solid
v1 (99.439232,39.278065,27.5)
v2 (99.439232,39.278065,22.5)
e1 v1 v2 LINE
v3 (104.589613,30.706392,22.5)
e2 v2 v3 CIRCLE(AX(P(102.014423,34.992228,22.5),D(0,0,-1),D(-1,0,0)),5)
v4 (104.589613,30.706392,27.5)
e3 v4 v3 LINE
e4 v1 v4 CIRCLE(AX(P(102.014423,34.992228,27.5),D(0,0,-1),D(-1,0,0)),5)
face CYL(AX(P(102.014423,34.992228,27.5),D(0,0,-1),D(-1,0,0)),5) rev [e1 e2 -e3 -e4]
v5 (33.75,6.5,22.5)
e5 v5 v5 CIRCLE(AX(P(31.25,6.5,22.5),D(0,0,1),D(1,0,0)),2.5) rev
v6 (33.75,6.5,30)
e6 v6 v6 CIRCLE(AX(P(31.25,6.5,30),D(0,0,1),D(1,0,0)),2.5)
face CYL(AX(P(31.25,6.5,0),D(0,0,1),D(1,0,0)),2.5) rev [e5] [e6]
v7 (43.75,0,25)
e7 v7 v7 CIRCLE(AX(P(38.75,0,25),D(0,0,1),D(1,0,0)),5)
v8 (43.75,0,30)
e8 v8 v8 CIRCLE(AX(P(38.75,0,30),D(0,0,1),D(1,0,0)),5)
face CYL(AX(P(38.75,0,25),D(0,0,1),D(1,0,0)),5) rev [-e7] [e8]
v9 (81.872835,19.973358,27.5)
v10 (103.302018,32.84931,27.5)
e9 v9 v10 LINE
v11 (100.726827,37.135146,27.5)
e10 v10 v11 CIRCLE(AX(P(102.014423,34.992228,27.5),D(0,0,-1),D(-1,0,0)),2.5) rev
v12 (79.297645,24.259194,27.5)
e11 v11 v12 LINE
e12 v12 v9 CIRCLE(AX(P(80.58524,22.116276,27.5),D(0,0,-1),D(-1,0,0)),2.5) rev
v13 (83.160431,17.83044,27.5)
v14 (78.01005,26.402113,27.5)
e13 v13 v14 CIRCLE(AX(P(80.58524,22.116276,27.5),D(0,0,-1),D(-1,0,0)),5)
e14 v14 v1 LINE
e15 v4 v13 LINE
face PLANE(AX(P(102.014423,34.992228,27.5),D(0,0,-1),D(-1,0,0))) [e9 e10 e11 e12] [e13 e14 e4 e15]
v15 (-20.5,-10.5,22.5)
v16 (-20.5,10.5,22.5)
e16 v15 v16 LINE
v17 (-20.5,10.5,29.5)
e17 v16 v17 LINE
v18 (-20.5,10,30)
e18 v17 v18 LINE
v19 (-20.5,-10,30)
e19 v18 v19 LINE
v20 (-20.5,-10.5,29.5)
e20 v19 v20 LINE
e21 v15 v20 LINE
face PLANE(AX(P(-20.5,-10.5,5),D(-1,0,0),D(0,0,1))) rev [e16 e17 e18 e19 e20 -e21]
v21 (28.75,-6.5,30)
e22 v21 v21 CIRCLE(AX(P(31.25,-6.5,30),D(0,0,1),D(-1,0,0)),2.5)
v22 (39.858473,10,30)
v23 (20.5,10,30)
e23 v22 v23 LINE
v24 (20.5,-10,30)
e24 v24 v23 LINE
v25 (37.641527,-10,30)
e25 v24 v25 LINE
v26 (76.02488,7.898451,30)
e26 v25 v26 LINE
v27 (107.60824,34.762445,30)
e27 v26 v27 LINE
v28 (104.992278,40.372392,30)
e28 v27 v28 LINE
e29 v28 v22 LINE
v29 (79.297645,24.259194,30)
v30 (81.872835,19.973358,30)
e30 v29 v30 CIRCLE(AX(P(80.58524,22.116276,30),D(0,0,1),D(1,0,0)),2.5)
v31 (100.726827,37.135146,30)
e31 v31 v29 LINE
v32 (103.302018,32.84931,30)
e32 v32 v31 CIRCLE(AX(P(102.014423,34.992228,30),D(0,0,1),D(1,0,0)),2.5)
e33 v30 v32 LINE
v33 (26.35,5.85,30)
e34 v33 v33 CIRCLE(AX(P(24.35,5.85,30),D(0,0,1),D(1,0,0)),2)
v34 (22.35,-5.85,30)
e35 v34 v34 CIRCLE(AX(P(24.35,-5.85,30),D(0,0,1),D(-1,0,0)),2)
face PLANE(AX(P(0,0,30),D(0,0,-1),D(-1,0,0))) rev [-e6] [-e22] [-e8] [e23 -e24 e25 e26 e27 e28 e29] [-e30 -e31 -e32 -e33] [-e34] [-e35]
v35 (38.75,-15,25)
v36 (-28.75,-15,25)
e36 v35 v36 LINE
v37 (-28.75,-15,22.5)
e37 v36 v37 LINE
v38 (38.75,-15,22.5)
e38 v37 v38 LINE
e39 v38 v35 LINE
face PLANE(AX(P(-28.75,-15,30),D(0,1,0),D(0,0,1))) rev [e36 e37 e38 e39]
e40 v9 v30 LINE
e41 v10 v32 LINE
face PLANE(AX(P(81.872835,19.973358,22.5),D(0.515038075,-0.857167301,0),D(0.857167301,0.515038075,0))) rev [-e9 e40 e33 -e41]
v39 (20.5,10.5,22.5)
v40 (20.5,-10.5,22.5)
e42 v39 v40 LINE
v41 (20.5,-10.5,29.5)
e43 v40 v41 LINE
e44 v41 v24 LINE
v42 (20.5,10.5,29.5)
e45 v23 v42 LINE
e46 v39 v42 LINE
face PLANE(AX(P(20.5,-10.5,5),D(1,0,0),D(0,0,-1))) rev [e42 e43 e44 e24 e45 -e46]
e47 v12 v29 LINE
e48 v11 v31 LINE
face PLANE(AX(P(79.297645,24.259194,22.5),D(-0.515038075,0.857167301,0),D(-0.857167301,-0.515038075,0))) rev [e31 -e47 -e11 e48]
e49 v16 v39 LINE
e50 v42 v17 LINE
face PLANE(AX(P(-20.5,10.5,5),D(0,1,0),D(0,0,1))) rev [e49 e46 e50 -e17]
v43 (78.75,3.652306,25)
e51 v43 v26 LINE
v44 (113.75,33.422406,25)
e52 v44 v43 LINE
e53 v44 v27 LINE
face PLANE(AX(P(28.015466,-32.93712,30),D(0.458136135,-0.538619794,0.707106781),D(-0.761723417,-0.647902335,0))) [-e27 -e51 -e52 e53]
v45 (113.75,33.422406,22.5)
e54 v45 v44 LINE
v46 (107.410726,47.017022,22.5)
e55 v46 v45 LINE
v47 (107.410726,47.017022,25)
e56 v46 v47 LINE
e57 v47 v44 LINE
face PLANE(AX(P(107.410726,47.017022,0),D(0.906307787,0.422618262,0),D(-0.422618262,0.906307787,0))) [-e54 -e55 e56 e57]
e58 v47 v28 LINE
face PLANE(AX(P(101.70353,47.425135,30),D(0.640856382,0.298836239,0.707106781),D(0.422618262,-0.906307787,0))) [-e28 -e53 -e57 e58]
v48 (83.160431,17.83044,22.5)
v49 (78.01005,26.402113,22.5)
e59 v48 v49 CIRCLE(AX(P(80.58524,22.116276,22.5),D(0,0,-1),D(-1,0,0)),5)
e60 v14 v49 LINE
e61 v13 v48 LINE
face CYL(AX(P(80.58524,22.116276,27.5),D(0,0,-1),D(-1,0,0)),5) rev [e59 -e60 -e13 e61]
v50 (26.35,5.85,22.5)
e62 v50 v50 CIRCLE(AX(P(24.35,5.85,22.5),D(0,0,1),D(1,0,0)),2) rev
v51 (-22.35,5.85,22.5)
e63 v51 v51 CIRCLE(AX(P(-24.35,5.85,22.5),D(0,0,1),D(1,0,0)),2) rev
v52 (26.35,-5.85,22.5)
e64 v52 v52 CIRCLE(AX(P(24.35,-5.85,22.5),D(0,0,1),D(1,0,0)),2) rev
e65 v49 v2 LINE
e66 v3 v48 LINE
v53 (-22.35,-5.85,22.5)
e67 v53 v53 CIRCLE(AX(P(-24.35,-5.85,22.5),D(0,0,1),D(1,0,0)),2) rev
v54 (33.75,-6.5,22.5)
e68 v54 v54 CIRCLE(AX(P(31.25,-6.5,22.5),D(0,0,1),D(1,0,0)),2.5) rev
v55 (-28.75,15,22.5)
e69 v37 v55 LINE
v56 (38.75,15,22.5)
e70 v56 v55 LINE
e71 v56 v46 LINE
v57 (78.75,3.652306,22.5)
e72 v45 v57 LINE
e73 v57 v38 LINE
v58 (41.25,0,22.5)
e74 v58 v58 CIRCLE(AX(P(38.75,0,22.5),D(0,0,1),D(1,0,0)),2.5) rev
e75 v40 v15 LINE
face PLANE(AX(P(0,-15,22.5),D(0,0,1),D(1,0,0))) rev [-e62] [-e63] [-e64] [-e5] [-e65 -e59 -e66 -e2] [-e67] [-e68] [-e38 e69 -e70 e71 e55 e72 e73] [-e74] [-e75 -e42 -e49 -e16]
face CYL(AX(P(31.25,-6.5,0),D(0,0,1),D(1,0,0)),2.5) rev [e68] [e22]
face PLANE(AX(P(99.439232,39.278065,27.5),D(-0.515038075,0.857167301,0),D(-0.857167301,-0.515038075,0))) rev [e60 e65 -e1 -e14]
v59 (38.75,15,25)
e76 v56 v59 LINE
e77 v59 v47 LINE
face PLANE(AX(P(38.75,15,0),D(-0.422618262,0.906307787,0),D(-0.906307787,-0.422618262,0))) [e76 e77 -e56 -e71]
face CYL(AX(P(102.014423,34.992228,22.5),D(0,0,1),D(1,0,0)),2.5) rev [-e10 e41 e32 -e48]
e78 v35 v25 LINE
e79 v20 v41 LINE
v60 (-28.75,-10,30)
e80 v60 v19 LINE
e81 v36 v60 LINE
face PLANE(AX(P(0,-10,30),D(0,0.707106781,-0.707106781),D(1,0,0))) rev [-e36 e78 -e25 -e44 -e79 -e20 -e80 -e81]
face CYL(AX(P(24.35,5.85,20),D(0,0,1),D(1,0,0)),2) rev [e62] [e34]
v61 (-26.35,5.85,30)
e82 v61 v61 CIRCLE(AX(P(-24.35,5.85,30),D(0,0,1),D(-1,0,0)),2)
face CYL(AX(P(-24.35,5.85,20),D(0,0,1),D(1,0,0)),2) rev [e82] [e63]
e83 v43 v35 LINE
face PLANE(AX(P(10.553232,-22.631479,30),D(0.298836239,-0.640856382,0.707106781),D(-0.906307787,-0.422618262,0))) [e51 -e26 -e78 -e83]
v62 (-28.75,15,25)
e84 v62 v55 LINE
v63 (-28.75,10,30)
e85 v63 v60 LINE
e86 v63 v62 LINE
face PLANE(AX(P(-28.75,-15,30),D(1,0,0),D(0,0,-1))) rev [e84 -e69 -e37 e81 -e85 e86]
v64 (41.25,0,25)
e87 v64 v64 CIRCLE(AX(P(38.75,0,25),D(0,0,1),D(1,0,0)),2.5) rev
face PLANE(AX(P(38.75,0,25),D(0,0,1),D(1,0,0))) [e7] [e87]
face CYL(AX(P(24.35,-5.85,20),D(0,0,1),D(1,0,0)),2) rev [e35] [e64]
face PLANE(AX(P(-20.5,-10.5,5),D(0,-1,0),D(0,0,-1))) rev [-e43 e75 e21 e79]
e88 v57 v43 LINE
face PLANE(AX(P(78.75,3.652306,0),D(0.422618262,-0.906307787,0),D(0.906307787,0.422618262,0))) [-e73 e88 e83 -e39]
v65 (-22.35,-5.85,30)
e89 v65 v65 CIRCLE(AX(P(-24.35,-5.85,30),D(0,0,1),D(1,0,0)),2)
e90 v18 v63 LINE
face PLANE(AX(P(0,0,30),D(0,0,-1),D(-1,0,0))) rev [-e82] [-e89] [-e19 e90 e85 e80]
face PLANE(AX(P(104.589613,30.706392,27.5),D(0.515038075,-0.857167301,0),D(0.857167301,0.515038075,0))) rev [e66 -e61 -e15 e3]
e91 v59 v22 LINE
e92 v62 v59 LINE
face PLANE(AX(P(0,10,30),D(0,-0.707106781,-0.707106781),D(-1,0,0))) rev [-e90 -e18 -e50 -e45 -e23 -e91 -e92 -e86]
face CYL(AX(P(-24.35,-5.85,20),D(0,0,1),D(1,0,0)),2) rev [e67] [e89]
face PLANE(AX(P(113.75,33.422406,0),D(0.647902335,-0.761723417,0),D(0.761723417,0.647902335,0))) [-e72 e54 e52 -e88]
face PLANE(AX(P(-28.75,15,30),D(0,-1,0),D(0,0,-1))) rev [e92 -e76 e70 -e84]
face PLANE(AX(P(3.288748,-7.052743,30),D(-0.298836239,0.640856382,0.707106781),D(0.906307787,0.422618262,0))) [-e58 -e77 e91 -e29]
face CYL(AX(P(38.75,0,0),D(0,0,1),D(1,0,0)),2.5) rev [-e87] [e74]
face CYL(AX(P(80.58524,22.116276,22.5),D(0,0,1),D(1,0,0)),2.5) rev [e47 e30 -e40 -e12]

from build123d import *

# Parameters (mm, degrees)
SKETCH1_W                = 57.5
SKETCH1_H                = 30
BOSS_EXTRUDE1_DEPTH      = 30
SKETCH2_W                = 41
SKETCH2_H                = 21
CUT_EXTRUDE1_DEPTH       = 25
SKETCH8_R                = 2
CUT_EXTRUDE6_DEPTH       = 10
SKETCH10_R               = 5
CUT_EXTRUDE8_DEPTH       = 10
BOSS_EXTRUDE4_DEPTH      = 30
SKETCH16_R               = 5
CUT_EXTRUDE10_DEPTH      = 30
CHAMFER5_SIZE            = 5
SKETCH19_R               = 2.5
CUT_EXTRUDE12_DEPTH      = 30
SKETCH20_R               = 7.5
CUT_EXTRUDE13_DEPTH      = 2.5
CUT_EXTRUDE15_DEPTH      = 122.918629513
CUT_EXTRUDE15_DEPTH_BACK = 122.918629513
SKETCH29_W               = 67.5
SKETCH29_H               = 17.5
CUT_EXTRUDE16_DEPTH      = 124.312257678
SKETCH32_R               = 5
CUT_EXTRUDE18_DEPTH      = 5
CUT_EXTRUDE19_DEPTH      = 5


with BuildPart() as part:
    # Sketch1 → Boss-Extrude1 (new body)
    with BuildSketch(Plane.XY):
        Rectangle(SKETCH1_W, SKETCH1_H)
    extrude(amount=BOSS_EXTRUDE1_DEPTH)

    # Sketch2 → Cut-Extrude1 (cut)
    with BuildSketch(Plane.XY.offset(30)):
        Rectangle(SKETCH2_W, SKETCH2_H)
    extrude(amount=-CUT_EXTRUDE1_DEPTH, mode=Mode.SUBTRACT)

    # Sketch8 → Cut-Extrude6 (cut)
    with BuildSketch(Plane.XY.offset(30)):
        with Locations((24.35, 5.85)):
            Circle(SKETCH8_R)
        with Locations(Location((24.35, -5.85, 0), (0, 0, 180))):
            Circle(SKETCH8_R)
        with Locations((-24.35, -5.85)):
            Circle(SKETCH8_R)
        with Locations(Location((-24.35, 5.85, 0), (0, 0, 180))):
            Circle(SKETCH8_R)
    extrude(amount=-CUT_EXTRUDE6_DEPTH, mode=Mode.SUBTRACT)

    # Sketch10 → Cut-Extrude8 (cut)
    with BuildSketch(Plane.XY.offset(5)):
        with Locations((-10, 0)):
            Circle(SKETCH10_R)
    extrude(amount=-CUT_EXTRUDE8_DEPTH, mode=Mode.SUBTRACT)

    # Sketch13 → Boss-Extrude4 (add)
    with BuildSketch(Plane.XY.offset(30)):
        Polygon((28.75, 15), (38.75, 15), (107.410726074, 47.017022383), (113.75, 33.422405577), (78.75, 3.652306326), (38.75, -15), (28.75, -15), align=None)
    extrude(amount=-BOSS_EXTRUDE4_DEPTH)

    # Sketch16 → Cut-Extrude10 (cut)
    with BuildSketch(Plane(origin=(1.175656739, -2.521204013, 0), x_dir=(0.9063077870366488, 0.42261826174070183, 0), z_dir=(-0.42261826174070183, 0.9063077870366488, 0))):
        with Locations(Location((97.217429724, -15, 0), (0, 0, 180))):
            Circle(SKETCH16_R)
        with BuildLine():
            Line((67.217429724, -12.5), (82.217429724, -12.5))
            ThreePointArc((82.217429724, -12.5), (84.717429724, -15), (82.217429724, -17.5))
            Line((82.217429724, -17.5), (67.217429724, -17.5))
            ThreePointArc((67.217429724, -17.5), (64.717429724, -15), (67.217429724, -12.5))
        make_face()
    extrude(amount=-CUT_EXTRUDE10_DEPTH, mode=Mode.SUBTRACT)

    # Chamfer5
    # the kernel refuses this chamfer: 5 mm, written as the material it takes off along each edge
    with BuildSketch(Plane(origin=(-28.75, 27.85841494, 0), x_dir=(-0.027495876610586317, 0, 0.9996219169112968), z_dir=(0, -1, 0))) as chamfer5_piece_1:
        Polygon((CHAMFER5_SIZE * 0.999621916911, -CHAMFER5_SIZE * 0.0274958766106), (-CHAMFER5_SIZE * 0.0274958766106, -CHAMFER5_SIZE * 0.999621916911), (0, 0), align=None)
    extrude(amount=55.71682988, mode=Mode.SUBTRACT)
    with BuildSketch(Plane(origin=(-41.60841494, -15, 0), x_dir=(0, -0.027495876610586317, 0.9996219169112968), z_dir=(1, 0, 0)), Plane(origin=(51.60841494, -15, 30), x_dir=(0, -0.027495876610586317, -0.9996219169112968), z_dir=(-1, 0, 0))) as chamfer5_piece_2:
        Polygon((CHAMFER5_SIZE * 0.999621916911, -CHAMFER5_SIZE * 0.0274958766106), (-CHAMFER5_SIZE * 0.0274958766106, -CHAMFER5_SIZE * 0.999621916911), (0, 0), align=None)
    extrude(amount=93.21682988, mode=Mode.SUBTRACT)
    with BuildSketch(Plane(origin=(90.403681589, 9.086507297, 0), x_dir=(0.011620259578202724, -0.024919727083573626, 0.9996219169112968), z_dir=(-0.9063077870366526, -0.4226182617406939, 0)), Plane(origin=(90.403681589, 9.086507297, 30), x_dir=(-0.4224584769229526, 0.905965127389214, 0.02749587661058631), z_dir=(-0.9063077870366526, -0.4226182617406939, 0))) as chamfer5_piece_3:
        Polygon((CHAMFER5_SIZE * 0.999621916911, CHAMFER5_SIZE * 0.0274958766106), (-CHAMFER5_SIZE * 0.0274958766106, CHAMFER5_SIZE * 0.999621916911), (0, 0), align=None)
    extrude(amount=69.851946638, mode=Mode.SUBTRACT)
    with BuildSketch(Plane(origin=(123.544555766, 41.753402643, 0), x_dir=(-0.6476573741944397, 0.7614354223576539, -0.027495876610586414), z_dir=(-0.7617234170999287, -0.6479023351104763, 0))) as chamfer5_piece_4:
        Polygon((CHAMFER5_SIZE * 0.999621916911, -CHAMFER5_SIZE * 0.0274958766106), (-CHAMFER5_SIZE * 0.0274958766106, -CHAMFER5_SIZE * 0.999621916911), (0, 0), align=None)
    extrude(amount=71.665266299, mode=Mode.SUBTRACT)
    with BuildSketch(Plane(origin=(101.976525103, 58.670703972, 0), x_dir=(-0.9059651273892108, -0.42245847692295924, -0.027495876610586344), z_dir=(0.42261826174070055, -0.9063077870366495, 0))) as chamfer5_piece_5:
        Polygon((CHAMFER5_SIZE * 0.999621916911, -CHAMFER5_SIZE * 0.0274958766106), (-CHAMFER5_SIZE * 0.0274958766106, -CHAMFER5_SIZE * 0.999621916911), (0, 0), align=None)
    extrude(amount=40.71682988, mode=Mode.SUBTRACT)
    with BuildSketch(Plane(origin=(27.096318411, 9.565799029, 0), x_dir=(0.4224584769229604, -0.9059651273892103, -0.02749587661058636), z_dir=(0.9063077870366489, 0.4226182617407018, 0))) as chamfer5_piece_6_section:
        Polygon((CHAMFER5_SIZE * 0.999621916911, -CHAMFER5_SIZE * 0.0274958766106), (-CHAMFER5_SIZE * 0.0274958766106, -CHAMFER5_SIZE * 0.999621916911), (0, 0), align=None)
    chamfer5_piece_6 = extrude(amount=101.47555893, mode=Mode.PRIVATE)
    chamfer5_piece_6 = split(chamfer5_piece_6, bisect_by=Plane(origin=(81.150743587, 15, 1.670360501), z_dir=(0, 1, 0)), keep=Keep.TOP, mode=Mode.PRIVATE)
    add(chamfer5_piece_6, mode=Mode.SUBTRACT)
    with BuildSketch(Plane(origin=(-41.60841494, 15, 0), x_dir=(0, -0.9996219169112968, -0.027495876610586372), z_dir=(1, 0, 0))) as chamfer5_piece_7_section:
        Polygon((CHAMFER5_SIZE * 0.999621916911, -CHAMFER5_SIZE * 0.0274958766106), (-CHAMFER5_SIZE * 0.0274958766106, -CHAMFER5_SIZE * 0.999621916911), (0, 0), align=None)
    chamfer5_piece_7 = extrude(amount=93.21682988, mode=Mode.PRIVATE)
    chamfer5_piece_7 = split(chamfer5_piece_7, bisect_by=Plane(origin=(3.719146846, -1.335155097, 1.672660276), z_dir=(-0.4226182617407018, 0.9063077870366489, 0)), keep=Keep.TOP, mode=Mode.PRIVATE)
    add(chamfer5_piece_7, mode=Mode.SUBTRACT)
    with BuildSketch(Plane(origin=(51.60841494, 15, 30), x_dir=(0, -0.9996219169112968, 0.027495876610586317), z_dir=(-1, 0, 0))) as chamfer5_piece_8_section:
        Polygon((CHAMFER5_SIZE * 0.999621916911, -CHAMFER5_SIZE * 0.0274958766106), (-CHAMFER5_SIZE * 0.0274958766106, -CHAMFER5_SIZE * 0.999621916911), (0, 0), align=None)
    chamfer5_piece_8 = extrude(amount=93.21682988, mode=Mode.PRIVATE)
    chamfer5_piece_8 = split(chamfer5_piece_8, bisect_by=Plane(origin=(3.719146846, -1.335155097, 28.327339724), z_dir=(-0.4226182617407018, 0.9063077870366489, 0)), keep=Keep.TOP, mode=Mode.PRIVATE)
    add(chamfer5_piece_8, mode=Mode.SUBTRACT)
    with BuildSketch(Plane(origin=(123.544555766, 41.753402643, 30), x_dir=(-0.6476573741944397, 0.7614354223576539, 0.02749587661058634), z_dir=(-0.7617234170999287, -0.6479023351104763, 0))) as chamfer5_piece_9:
        Polygon((CHAMFER5_SIZE * 0.999621916911, CHAMFER5_SIZE * 0.0274958766106), (-CHAMFER5_SIZE * 0.0274958766106, CHAMFER5_SIZE * 0.999621916911), (0, 0), align=None)
    extrude(amount=71.665266299, mode=Mode.SUBTRACT)
    with BuildSketch(Plane(origin=(27.096318411, 9.565799029, 30), x_dir=(0.4224584769229604, -0.9059651273892103, 0.027495876610586313), z_dir=(0.9063077870366489, 0.4226182617407018, 0))) as chamfer5_piece_10_section:
        Polygon((CHAMFER5_SIZE * 0.999621916911, CHAMFER5_SIZE * 0.0274958766106), (-CHAMFER5_SIZE * 0.0274958766106, CHAMFER5_SIZE * 0.999621916911), (0, 0), align=None)
    chamfer5_piece_10 = extrude(amount=101.47555893, mode=Mode.PRIVATE)
    chamfer5_piece_10 = split(chamfer5_piece_10, bisect_by=Plane(origin=(81.150743587, 15, 28.329639499), z_dir=(0, 1, 0)), keep=Keep.TOP, mode=Mode.PRIVATE)
    add(chamfer5_piece_10, mode=Mode.SUBTRACT)
    with BuildSketch(Plane(origin=(101.976525103, 58.670703972, 30), x_dir=(-0.9059651273892108, -0.42245847692295924, 0.027495876610586337), z_dir=(0.42261826174070055, -0.9063077870366495, 0))) as chamfer5_piece_11:
        Polygon((CHAMFER5_SIZE * 0.999621916911, CHAMFER5_SIZE * 0.0274958766106), (-CHAMFER5_SIZE * 0.0274958766106, CHAMFER5_SIZE * 0.999621916911), (0, 0), align=None)
    extrude(amount=40.71682988, mode=Mode.SUBTRACT)
    with BuildSketch(Plane(origin=(27.096318411, 9.565799029, 0), x_dir=(0.4224584769229604, -0.9059651273892103, -0.02749587661058636), z_dir=(0.9063077870366489, 0.4226182617407018, 0))) as chamfer5_piece_12a_section:
        Polygon((CHAMFER5_SIZE * 0.999621916911, -CHAMFER5_SIZE * 0.0274958766106), (-CHAMFER5_SIZE * 0.0274958766106, -CHAMFER5_SIZE * 0.999621916911), (0, 0), align=None)
    chamfer5_piece_12a = extrude(amount=101.47555893, mode=Mode.PRIVATE)
    chamfer5_piece_12a = split(chamfer5_piece_12a, bisect_by=Plane(origin=(35.512062488, 15, 1.537951212), z_dir=(0, -1, 0)), keep=Keep.TOP, mode=Mode.PRIVATE)
    with BuildSketch(Plane(origin=(-41.60841494, 15, 0), x_dir=(0, -0.9996219169112968, -0.027495876610586372), z_dir=(1, 0, 0))) as chamfer5_piece_12b_section:
        Polygon((CHAMFER5_SIZE * 0.999621916911, -CHAMFER5_SIZE * 0.0274958766106), (-CHAMFER5_SIZE * 0.0274958766106, -CHAMFER5_SIZE * 0.999621916911), (0, 0), align=None)
    chamfer5_piece_12b = extrude(amount=93.21682988, mode=Mode.PRIVATE)
    chamfer5_piece_12b = split(chamfer5_piece_12b, bisect_by=Plane(origin=(41.684567981, 16.368411523, 1.537951212), z_dir=(0.4226182617407018, -0.9063077870366489, 0)), keep=Keep.TOP, mode=Mode.PRIVATE)
    chamfer5_piece_12 = chamfer5_piece_12a & chamfer5_piece_12b
    add(chamfer5_piece_12, mode=Mode.SUBTRACT)
    with BuildSketch(Plane(origin=(27.096318411, 9.565799029, 30), x_dir=(0.4224584769229604, -0.9059651273892103, 0.027495876610586313), z_dir=(0.9063077870366489, 0.4226182617407018, 0))) as chamfer5_piece_13a_section:
        Polygon((CHAMFER5_SIZE * 0.999621916911, CHAMFER5_SIZE * 0.0274958766106), (-CHAMFER5_SIZE * 0.0274958766106, CHAMFER5_SIZE * 0.999621916911), (0, 0), align=None)
    chamfer5_piece_13a = extrude(amount=101.47555893, mode=Mode.PRIVATE)
    chamfer5_piece_13a = split(chamfer5_piece_13a, bisect_by=Plane(origin=(35.512062488, 15, 28.462048788), z_dir=(0, -1, 0)), keep=Keep.TOP, mode=Mode.PRIVATE)
    with BuildSketch(Plane(origin=(51.60841494, 15, 30), x_dir=(0, -0.9996219169112968, 0.027495876610586317), z_dir=(-1, 0, 0))) as chamfer5_piece_13b_section:
        Polygon((CHAMFER5_SIZE * 0.999621916911, -CHAMFER5_SIZE * 0.0274958766106), (-CHAMFER5_SIZE * 0.0274958766106, -CHAMFER5_SIZE * 0.999621916911), (0, 0), align=None)
    chamfer5_piece_13b = extrude(amount=93.21682988, mode=Mode.PRIVATE)
    chamfer5_piece_13b = split(chamfer5_piece_13b, bisect_by=Plane(origin=(41.684567981, 16.368411523, 28.462048788), z_dir=(0.4226182617407018, -0.9063077870366489, 0)), keep=Keep.TOP, mode=Mode.PRIVATE)
    chamfer5_piece_13 = chamfer5_piece_13a & chamfer5_piece_13b
    add(chamfer5_piece_13, mode=Mode.SUBTRACT)

    # Sketch19 → Cut-Extrude12 (cut)
    with BuildSketch(Plane.XY.offset(30)):
        with Locations((38.75, 0)):
            Circle(SKETCH19_R)
        with Locations((31.25, 6.5)):
            Circle(SKETCH19_R)
        with Locations(Location((31.25, -6.5, 0), (0, 0, 180))):
            Circle(SKETCH19_R)
    extrude(amount=-CUT_EXTRUDE12_DEPTH, mode=Mode.SUBTRACT)

    # Sketch20 → Cut-Extrude13 (cut)
    with BuildSketch(Plane.XY.offset(5)):
        with Locations((-10, 0)):
            Circle(SKETCH20_R)
    extrude(amount=-CUT_EXTRUDE13_DEPTH, mode=Mode.SUBTRACT)

    # Sketch29 → Cut-Extrude15 (cut, two sides: drawn at the far end of the back side and taken through both)
    with BuildSketch(Plane(origin=(0, 15, 0), x_dir=(1, 0, 0), z_dir=(0, 1, 0)).offset(-CUT_EXTRUDE15_DEPTH_BACK)):
        with Locations((5, -13.75)):
            Rectangle(SKETCH29_W, SKETCH29_H)
        Polygon((38.75, -22.5), (113.75, -22.5), (113.75, 0), (-28.75, 0), (-28.75, -5), (38.75, -5), align=None)
    extrude(amount=CUT_EXTRUDE15_DEPTH + CUT_EXTRUDE15_DEPTH_BACK, mode=Mode.SUBTRACT)

    # Sketch30 → Cut-Extrude16 (cut, through all)
    with BuildSketch(Plane.XY.offset(30)):
        with BuildLine():
            Line((79.297644941, 24.259194476), (100.726827459, 37.135146348))
            ThreePointArc((100.726827459, 37.135146348), (104.157340898, 36.279823284), (103.302017833, 32.849309845))
            Line((103.302017833, 32.849309845), (81.872835316, 19.973357972))
            ThreePointArc((81.872835316, 19.973357972), (78.442321877, 20.828681036), (79.297644941, 24.259194476))
        make_face()
    extrude(amount=-CUT_EXTRUDE16_DEPTH, mode=Mode.SUBTRACT)

    # Sketch32 → Cut-Extrude18 (cut)
    with BuildSketch(Plane.XY.offset(30)):
        with Locations((38.75, 0)):
            Circle(SKETCH32_R)
    extrude(amount=-CUT_EXTRUDE18_DEPTH, mode=Mode.SUBTRACT)

    # Sketch36 → Cut-Extrude19 (cut)
    with BuildSketch(Plane(origin=(0, 0, 22.5), x_dir=(-1, 0, 0), z_dir=(0, 0, -1))):
        with BuildLine():
            Line((-99.439232272, 39.2780646), (-78.010049754, 26.402112727))
            ThreePointArc((-78.010049754, 26.402112727), (-76.299403625, 19.541085849), (-83.160430503, 17.83043972))
            Line((-83.160430503, 17.83043972), (-104.589613021, 30.706391593))
            ThreePointArc((-104.589613021, 30.706391593), (-106.30025915, 37.567418471), (-99.439232272, 39.2780646))
        make_face()
    extrude(amount=-CUT_EXTRUDE19_DEPTH, mode=Mode.SUBTRACT)


solid = part.part
